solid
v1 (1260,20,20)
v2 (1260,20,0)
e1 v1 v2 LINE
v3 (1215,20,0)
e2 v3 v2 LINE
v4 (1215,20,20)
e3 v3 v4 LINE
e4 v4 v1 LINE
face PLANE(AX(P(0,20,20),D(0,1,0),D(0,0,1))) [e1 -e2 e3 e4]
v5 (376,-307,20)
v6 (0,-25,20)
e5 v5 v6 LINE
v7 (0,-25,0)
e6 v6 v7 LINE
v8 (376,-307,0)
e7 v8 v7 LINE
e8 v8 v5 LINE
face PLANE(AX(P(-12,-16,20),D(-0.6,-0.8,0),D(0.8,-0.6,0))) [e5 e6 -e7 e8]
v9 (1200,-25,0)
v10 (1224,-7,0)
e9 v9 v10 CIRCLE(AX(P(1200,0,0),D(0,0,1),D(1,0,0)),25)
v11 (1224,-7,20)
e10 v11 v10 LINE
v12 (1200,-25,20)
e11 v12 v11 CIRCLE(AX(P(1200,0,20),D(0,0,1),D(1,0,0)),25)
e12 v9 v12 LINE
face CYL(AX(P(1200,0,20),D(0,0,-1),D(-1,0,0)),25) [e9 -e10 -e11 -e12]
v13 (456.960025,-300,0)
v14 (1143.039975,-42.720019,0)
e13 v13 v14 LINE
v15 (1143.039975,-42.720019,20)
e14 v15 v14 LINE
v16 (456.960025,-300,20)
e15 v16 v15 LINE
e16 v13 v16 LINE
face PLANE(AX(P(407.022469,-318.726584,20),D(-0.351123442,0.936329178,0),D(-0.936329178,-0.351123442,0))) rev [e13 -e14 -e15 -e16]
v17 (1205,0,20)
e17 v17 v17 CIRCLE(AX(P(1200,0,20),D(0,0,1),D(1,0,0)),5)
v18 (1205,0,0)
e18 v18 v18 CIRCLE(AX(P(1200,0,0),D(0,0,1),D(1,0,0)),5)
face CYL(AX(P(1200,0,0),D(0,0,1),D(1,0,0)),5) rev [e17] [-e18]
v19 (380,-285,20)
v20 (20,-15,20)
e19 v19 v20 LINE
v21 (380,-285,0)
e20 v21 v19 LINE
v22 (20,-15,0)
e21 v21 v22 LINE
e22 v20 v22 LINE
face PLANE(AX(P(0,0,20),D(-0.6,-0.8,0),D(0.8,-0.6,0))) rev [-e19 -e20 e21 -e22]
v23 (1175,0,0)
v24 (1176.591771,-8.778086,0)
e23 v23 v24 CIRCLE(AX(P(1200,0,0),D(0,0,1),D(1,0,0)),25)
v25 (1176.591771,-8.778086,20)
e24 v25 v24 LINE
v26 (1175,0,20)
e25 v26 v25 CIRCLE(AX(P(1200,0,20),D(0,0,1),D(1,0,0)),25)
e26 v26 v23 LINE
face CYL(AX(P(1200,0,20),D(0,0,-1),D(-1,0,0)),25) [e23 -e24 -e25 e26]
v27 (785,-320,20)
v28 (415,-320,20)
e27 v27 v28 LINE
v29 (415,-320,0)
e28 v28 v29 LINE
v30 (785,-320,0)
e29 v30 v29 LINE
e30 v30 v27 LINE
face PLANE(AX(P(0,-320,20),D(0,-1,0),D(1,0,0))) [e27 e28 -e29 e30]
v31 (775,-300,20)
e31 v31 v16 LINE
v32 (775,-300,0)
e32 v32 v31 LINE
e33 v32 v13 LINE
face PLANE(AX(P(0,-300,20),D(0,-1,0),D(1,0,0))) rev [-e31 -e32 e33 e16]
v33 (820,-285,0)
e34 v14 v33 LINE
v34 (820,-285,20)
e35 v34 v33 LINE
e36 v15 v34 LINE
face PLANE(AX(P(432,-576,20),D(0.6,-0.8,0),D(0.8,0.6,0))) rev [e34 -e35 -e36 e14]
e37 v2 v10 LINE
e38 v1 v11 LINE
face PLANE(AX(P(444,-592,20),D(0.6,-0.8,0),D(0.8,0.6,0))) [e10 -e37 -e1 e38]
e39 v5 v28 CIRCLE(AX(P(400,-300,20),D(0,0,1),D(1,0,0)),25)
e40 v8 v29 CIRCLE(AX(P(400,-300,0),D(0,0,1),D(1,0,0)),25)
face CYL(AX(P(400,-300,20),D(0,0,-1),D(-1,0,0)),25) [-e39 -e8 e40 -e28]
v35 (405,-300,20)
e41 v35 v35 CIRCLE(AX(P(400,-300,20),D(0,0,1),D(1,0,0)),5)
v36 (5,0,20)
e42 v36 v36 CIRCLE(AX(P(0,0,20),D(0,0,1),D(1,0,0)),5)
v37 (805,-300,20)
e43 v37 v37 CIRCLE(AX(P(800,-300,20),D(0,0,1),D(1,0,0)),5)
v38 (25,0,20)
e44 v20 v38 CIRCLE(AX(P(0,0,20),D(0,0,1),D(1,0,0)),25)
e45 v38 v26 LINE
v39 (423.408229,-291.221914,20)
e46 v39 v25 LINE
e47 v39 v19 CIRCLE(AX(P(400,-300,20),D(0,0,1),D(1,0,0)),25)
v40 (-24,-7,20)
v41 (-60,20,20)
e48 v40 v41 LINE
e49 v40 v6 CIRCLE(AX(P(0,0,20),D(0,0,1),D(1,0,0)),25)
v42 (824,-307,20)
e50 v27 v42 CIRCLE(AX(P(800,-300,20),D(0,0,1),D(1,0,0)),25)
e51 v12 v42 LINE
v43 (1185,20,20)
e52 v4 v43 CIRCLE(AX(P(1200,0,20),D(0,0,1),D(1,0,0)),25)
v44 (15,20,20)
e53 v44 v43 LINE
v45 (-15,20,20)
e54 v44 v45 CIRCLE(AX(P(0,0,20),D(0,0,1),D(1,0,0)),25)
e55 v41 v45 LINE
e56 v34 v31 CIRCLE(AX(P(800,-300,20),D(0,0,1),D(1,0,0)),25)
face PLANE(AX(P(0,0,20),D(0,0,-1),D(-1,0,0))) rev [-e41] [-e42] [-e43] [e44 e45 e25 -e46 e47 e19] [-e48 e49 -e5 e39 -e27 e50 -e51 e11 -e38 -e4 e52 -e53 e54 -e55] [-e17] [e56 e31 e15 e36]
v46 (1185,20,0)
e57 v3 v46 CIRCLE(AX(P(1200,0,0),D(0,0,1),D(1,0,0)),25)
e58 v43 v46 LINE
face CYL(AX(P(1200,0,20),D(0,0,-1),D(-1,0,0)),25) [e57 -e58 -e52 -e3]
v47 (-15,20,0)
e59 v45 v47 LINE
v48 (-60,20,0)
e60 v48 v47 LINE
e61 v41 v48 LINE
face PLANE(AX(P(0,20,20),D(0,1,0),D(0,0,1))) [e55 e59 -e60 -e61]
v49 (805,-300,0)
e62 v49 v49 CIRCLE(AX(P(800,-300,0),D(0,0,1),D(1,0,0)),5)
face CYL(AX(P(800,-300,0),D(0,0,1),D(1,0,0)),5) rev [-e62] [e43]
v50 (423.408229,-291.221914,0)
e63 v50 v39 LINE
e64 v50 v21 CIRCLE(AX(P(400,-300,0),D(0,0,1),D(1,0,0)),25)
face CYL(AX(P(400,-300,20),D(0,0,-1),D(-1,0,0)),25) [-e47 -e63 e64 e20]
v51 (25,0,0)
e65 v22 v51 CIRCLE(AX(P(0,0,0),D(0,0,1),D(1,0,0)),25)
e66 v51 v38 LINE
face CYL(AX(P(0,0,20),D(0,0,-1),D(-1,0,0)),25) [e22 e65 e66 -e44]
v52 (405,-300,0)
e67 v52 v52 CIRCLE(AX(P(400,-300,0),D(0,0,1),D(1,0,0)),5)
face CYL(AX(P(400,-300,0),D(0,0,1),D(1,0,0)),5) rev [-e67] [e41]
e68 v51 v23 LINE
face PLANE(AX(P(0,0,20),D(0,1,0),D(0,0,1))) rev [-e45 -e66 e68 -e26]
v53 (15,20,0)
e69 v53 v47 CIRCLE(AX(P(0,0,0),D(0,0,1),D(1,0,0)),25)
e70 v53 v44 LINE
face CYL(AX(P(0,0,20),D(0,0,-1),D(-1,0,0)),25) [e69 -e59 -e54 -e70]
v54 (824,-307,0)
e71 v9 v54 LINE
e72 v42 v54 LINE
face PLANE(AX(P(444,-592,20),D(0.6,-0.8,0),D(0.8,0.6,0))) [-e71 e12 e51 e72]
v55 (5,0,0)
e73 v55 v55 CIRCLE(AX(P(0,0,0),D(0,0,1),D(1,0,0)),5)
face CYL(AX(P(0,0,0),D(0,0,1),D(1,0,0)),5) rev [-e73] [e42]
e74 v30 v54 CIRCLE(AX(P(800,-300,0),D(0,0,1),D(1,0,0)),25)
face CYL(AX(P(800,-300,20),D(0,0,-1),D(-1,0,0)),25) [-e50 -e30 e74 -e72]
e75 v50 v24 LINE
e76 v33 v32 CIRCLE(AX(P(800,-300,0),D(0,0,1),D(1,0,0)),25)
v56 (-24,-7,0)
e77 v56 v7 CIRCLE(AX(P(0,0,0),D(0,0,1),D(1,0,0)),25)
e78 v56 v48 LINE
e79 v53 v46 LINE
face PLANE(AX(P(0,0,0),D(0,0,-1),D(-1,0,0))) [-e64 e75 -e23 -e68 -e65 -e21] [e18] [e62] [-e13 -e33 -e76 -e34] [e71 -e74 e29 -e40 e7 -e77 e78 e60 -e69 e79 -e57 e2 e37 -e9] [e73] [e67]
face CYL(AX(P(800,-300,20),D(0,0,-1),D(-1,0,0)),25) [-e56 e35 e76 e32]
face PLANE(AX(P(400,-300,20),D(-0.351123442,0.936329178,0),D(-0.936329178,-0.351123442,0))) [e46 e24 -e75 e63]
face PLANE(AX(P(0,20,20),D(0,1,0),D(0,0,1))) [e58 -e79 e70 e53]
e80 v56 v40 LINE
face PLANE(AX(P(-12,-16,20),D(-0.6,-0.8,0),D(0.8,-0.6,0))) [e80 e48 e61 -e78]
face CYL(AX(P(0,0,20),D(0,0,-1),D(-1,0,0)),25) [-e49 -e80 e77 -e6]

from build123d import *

# Parameters (mm, degrees)
EXTRUDE_THIN2_DEPTH = 20
SKETCH4_R           = 5
CUT_EXTRUDE1_DEPTH  = 1302.393483924


# Read off the part's stored shape, not the designer's step: Extrude-Thin2
with BuildPart() as part:
    # Extrude-Thin2 outline → Extrude-Thin2 (new body)
    with BuildSketch(Plane.XY):
        with BuildLine():
            Line((-15, 20), (-60, 20))
            Line((-60, 20), (-24, -7))
            ThreePointArc((-24, -7), (-15, -20), (0, -25))
            Line((0, -25), (376, -307))
            ThreePointArc((376, -307), (392.09430585, -323.717082451), (415, -320))
            Line((415, -320), (785, -320))
            ThreePointArc((785, -320), (807.90569415, -323.717082451), (824, -307))
            Line((824, -307), (1200, -25))
            ThreePointArc((1200, -25), (1215, -20), (1224, -7))
            Line((1224, -7), (1260, 20))
            Line((1260, 20), (1215, 20))
            ThreePointArc((1215, 20), (1200, 25), (1185, 20))
            Line((1185, 20), (15, 20))
            ThreePointArc((15, 20), (0, 25), (-15, 20))
        make_face()
        with BuildLine():
            Line((456.960024969, -300), (1143.039975031, -42.720018727))
            Line((1143.039975031, -42.720018727), (820, -285))
            ThreePointArc((820, -285), (792.09430585, -276.282917549), (775, -300))
            Line((775, -300), (456.960024969, -300))
        make_face(mode=Mode.SUBTRACT)
        with BuildLine():
            ThreePointArc((1175, 0), (1175.401161247, -4.460620138), (1176.591770561, -8.77808604))
            Line((1176.591770561, -8.77808604), (423.408229439, -291.22191396))
            ThreePointArc((423.408229439, -291.22191396), (403.547120002, -275.252920583), (380, -285))
            Line((380, -285), (20, -15))
            ThreePointArc((20, -15), (23.717082451, -7.90569415), (25, 0))
            Line((25, 0), (1175, 0))
        make_face(mode=Mode.SUBTRACT)
    extrude(amount=EXTRUDE_THIN2_DEPTH)

    # Sketch4 → Cut-Extrude1 (cut, through all)
    with BuildSketch(Plane.XY.offset(20)):
        Circle(SKETCH4_R)
        with Locations((400, -300)):
            Circle(SKETCH4_R)
        with Locations((800, -300)):
            Circle(SKETCH4_R)
        with Locations((1200, 0)):
            Circle(SKETCH4_R)
    extrude(amount=-CUT_EXTRUDE1_DEPTH, mode=Mode.SUBTRACT)


solid = part.part
